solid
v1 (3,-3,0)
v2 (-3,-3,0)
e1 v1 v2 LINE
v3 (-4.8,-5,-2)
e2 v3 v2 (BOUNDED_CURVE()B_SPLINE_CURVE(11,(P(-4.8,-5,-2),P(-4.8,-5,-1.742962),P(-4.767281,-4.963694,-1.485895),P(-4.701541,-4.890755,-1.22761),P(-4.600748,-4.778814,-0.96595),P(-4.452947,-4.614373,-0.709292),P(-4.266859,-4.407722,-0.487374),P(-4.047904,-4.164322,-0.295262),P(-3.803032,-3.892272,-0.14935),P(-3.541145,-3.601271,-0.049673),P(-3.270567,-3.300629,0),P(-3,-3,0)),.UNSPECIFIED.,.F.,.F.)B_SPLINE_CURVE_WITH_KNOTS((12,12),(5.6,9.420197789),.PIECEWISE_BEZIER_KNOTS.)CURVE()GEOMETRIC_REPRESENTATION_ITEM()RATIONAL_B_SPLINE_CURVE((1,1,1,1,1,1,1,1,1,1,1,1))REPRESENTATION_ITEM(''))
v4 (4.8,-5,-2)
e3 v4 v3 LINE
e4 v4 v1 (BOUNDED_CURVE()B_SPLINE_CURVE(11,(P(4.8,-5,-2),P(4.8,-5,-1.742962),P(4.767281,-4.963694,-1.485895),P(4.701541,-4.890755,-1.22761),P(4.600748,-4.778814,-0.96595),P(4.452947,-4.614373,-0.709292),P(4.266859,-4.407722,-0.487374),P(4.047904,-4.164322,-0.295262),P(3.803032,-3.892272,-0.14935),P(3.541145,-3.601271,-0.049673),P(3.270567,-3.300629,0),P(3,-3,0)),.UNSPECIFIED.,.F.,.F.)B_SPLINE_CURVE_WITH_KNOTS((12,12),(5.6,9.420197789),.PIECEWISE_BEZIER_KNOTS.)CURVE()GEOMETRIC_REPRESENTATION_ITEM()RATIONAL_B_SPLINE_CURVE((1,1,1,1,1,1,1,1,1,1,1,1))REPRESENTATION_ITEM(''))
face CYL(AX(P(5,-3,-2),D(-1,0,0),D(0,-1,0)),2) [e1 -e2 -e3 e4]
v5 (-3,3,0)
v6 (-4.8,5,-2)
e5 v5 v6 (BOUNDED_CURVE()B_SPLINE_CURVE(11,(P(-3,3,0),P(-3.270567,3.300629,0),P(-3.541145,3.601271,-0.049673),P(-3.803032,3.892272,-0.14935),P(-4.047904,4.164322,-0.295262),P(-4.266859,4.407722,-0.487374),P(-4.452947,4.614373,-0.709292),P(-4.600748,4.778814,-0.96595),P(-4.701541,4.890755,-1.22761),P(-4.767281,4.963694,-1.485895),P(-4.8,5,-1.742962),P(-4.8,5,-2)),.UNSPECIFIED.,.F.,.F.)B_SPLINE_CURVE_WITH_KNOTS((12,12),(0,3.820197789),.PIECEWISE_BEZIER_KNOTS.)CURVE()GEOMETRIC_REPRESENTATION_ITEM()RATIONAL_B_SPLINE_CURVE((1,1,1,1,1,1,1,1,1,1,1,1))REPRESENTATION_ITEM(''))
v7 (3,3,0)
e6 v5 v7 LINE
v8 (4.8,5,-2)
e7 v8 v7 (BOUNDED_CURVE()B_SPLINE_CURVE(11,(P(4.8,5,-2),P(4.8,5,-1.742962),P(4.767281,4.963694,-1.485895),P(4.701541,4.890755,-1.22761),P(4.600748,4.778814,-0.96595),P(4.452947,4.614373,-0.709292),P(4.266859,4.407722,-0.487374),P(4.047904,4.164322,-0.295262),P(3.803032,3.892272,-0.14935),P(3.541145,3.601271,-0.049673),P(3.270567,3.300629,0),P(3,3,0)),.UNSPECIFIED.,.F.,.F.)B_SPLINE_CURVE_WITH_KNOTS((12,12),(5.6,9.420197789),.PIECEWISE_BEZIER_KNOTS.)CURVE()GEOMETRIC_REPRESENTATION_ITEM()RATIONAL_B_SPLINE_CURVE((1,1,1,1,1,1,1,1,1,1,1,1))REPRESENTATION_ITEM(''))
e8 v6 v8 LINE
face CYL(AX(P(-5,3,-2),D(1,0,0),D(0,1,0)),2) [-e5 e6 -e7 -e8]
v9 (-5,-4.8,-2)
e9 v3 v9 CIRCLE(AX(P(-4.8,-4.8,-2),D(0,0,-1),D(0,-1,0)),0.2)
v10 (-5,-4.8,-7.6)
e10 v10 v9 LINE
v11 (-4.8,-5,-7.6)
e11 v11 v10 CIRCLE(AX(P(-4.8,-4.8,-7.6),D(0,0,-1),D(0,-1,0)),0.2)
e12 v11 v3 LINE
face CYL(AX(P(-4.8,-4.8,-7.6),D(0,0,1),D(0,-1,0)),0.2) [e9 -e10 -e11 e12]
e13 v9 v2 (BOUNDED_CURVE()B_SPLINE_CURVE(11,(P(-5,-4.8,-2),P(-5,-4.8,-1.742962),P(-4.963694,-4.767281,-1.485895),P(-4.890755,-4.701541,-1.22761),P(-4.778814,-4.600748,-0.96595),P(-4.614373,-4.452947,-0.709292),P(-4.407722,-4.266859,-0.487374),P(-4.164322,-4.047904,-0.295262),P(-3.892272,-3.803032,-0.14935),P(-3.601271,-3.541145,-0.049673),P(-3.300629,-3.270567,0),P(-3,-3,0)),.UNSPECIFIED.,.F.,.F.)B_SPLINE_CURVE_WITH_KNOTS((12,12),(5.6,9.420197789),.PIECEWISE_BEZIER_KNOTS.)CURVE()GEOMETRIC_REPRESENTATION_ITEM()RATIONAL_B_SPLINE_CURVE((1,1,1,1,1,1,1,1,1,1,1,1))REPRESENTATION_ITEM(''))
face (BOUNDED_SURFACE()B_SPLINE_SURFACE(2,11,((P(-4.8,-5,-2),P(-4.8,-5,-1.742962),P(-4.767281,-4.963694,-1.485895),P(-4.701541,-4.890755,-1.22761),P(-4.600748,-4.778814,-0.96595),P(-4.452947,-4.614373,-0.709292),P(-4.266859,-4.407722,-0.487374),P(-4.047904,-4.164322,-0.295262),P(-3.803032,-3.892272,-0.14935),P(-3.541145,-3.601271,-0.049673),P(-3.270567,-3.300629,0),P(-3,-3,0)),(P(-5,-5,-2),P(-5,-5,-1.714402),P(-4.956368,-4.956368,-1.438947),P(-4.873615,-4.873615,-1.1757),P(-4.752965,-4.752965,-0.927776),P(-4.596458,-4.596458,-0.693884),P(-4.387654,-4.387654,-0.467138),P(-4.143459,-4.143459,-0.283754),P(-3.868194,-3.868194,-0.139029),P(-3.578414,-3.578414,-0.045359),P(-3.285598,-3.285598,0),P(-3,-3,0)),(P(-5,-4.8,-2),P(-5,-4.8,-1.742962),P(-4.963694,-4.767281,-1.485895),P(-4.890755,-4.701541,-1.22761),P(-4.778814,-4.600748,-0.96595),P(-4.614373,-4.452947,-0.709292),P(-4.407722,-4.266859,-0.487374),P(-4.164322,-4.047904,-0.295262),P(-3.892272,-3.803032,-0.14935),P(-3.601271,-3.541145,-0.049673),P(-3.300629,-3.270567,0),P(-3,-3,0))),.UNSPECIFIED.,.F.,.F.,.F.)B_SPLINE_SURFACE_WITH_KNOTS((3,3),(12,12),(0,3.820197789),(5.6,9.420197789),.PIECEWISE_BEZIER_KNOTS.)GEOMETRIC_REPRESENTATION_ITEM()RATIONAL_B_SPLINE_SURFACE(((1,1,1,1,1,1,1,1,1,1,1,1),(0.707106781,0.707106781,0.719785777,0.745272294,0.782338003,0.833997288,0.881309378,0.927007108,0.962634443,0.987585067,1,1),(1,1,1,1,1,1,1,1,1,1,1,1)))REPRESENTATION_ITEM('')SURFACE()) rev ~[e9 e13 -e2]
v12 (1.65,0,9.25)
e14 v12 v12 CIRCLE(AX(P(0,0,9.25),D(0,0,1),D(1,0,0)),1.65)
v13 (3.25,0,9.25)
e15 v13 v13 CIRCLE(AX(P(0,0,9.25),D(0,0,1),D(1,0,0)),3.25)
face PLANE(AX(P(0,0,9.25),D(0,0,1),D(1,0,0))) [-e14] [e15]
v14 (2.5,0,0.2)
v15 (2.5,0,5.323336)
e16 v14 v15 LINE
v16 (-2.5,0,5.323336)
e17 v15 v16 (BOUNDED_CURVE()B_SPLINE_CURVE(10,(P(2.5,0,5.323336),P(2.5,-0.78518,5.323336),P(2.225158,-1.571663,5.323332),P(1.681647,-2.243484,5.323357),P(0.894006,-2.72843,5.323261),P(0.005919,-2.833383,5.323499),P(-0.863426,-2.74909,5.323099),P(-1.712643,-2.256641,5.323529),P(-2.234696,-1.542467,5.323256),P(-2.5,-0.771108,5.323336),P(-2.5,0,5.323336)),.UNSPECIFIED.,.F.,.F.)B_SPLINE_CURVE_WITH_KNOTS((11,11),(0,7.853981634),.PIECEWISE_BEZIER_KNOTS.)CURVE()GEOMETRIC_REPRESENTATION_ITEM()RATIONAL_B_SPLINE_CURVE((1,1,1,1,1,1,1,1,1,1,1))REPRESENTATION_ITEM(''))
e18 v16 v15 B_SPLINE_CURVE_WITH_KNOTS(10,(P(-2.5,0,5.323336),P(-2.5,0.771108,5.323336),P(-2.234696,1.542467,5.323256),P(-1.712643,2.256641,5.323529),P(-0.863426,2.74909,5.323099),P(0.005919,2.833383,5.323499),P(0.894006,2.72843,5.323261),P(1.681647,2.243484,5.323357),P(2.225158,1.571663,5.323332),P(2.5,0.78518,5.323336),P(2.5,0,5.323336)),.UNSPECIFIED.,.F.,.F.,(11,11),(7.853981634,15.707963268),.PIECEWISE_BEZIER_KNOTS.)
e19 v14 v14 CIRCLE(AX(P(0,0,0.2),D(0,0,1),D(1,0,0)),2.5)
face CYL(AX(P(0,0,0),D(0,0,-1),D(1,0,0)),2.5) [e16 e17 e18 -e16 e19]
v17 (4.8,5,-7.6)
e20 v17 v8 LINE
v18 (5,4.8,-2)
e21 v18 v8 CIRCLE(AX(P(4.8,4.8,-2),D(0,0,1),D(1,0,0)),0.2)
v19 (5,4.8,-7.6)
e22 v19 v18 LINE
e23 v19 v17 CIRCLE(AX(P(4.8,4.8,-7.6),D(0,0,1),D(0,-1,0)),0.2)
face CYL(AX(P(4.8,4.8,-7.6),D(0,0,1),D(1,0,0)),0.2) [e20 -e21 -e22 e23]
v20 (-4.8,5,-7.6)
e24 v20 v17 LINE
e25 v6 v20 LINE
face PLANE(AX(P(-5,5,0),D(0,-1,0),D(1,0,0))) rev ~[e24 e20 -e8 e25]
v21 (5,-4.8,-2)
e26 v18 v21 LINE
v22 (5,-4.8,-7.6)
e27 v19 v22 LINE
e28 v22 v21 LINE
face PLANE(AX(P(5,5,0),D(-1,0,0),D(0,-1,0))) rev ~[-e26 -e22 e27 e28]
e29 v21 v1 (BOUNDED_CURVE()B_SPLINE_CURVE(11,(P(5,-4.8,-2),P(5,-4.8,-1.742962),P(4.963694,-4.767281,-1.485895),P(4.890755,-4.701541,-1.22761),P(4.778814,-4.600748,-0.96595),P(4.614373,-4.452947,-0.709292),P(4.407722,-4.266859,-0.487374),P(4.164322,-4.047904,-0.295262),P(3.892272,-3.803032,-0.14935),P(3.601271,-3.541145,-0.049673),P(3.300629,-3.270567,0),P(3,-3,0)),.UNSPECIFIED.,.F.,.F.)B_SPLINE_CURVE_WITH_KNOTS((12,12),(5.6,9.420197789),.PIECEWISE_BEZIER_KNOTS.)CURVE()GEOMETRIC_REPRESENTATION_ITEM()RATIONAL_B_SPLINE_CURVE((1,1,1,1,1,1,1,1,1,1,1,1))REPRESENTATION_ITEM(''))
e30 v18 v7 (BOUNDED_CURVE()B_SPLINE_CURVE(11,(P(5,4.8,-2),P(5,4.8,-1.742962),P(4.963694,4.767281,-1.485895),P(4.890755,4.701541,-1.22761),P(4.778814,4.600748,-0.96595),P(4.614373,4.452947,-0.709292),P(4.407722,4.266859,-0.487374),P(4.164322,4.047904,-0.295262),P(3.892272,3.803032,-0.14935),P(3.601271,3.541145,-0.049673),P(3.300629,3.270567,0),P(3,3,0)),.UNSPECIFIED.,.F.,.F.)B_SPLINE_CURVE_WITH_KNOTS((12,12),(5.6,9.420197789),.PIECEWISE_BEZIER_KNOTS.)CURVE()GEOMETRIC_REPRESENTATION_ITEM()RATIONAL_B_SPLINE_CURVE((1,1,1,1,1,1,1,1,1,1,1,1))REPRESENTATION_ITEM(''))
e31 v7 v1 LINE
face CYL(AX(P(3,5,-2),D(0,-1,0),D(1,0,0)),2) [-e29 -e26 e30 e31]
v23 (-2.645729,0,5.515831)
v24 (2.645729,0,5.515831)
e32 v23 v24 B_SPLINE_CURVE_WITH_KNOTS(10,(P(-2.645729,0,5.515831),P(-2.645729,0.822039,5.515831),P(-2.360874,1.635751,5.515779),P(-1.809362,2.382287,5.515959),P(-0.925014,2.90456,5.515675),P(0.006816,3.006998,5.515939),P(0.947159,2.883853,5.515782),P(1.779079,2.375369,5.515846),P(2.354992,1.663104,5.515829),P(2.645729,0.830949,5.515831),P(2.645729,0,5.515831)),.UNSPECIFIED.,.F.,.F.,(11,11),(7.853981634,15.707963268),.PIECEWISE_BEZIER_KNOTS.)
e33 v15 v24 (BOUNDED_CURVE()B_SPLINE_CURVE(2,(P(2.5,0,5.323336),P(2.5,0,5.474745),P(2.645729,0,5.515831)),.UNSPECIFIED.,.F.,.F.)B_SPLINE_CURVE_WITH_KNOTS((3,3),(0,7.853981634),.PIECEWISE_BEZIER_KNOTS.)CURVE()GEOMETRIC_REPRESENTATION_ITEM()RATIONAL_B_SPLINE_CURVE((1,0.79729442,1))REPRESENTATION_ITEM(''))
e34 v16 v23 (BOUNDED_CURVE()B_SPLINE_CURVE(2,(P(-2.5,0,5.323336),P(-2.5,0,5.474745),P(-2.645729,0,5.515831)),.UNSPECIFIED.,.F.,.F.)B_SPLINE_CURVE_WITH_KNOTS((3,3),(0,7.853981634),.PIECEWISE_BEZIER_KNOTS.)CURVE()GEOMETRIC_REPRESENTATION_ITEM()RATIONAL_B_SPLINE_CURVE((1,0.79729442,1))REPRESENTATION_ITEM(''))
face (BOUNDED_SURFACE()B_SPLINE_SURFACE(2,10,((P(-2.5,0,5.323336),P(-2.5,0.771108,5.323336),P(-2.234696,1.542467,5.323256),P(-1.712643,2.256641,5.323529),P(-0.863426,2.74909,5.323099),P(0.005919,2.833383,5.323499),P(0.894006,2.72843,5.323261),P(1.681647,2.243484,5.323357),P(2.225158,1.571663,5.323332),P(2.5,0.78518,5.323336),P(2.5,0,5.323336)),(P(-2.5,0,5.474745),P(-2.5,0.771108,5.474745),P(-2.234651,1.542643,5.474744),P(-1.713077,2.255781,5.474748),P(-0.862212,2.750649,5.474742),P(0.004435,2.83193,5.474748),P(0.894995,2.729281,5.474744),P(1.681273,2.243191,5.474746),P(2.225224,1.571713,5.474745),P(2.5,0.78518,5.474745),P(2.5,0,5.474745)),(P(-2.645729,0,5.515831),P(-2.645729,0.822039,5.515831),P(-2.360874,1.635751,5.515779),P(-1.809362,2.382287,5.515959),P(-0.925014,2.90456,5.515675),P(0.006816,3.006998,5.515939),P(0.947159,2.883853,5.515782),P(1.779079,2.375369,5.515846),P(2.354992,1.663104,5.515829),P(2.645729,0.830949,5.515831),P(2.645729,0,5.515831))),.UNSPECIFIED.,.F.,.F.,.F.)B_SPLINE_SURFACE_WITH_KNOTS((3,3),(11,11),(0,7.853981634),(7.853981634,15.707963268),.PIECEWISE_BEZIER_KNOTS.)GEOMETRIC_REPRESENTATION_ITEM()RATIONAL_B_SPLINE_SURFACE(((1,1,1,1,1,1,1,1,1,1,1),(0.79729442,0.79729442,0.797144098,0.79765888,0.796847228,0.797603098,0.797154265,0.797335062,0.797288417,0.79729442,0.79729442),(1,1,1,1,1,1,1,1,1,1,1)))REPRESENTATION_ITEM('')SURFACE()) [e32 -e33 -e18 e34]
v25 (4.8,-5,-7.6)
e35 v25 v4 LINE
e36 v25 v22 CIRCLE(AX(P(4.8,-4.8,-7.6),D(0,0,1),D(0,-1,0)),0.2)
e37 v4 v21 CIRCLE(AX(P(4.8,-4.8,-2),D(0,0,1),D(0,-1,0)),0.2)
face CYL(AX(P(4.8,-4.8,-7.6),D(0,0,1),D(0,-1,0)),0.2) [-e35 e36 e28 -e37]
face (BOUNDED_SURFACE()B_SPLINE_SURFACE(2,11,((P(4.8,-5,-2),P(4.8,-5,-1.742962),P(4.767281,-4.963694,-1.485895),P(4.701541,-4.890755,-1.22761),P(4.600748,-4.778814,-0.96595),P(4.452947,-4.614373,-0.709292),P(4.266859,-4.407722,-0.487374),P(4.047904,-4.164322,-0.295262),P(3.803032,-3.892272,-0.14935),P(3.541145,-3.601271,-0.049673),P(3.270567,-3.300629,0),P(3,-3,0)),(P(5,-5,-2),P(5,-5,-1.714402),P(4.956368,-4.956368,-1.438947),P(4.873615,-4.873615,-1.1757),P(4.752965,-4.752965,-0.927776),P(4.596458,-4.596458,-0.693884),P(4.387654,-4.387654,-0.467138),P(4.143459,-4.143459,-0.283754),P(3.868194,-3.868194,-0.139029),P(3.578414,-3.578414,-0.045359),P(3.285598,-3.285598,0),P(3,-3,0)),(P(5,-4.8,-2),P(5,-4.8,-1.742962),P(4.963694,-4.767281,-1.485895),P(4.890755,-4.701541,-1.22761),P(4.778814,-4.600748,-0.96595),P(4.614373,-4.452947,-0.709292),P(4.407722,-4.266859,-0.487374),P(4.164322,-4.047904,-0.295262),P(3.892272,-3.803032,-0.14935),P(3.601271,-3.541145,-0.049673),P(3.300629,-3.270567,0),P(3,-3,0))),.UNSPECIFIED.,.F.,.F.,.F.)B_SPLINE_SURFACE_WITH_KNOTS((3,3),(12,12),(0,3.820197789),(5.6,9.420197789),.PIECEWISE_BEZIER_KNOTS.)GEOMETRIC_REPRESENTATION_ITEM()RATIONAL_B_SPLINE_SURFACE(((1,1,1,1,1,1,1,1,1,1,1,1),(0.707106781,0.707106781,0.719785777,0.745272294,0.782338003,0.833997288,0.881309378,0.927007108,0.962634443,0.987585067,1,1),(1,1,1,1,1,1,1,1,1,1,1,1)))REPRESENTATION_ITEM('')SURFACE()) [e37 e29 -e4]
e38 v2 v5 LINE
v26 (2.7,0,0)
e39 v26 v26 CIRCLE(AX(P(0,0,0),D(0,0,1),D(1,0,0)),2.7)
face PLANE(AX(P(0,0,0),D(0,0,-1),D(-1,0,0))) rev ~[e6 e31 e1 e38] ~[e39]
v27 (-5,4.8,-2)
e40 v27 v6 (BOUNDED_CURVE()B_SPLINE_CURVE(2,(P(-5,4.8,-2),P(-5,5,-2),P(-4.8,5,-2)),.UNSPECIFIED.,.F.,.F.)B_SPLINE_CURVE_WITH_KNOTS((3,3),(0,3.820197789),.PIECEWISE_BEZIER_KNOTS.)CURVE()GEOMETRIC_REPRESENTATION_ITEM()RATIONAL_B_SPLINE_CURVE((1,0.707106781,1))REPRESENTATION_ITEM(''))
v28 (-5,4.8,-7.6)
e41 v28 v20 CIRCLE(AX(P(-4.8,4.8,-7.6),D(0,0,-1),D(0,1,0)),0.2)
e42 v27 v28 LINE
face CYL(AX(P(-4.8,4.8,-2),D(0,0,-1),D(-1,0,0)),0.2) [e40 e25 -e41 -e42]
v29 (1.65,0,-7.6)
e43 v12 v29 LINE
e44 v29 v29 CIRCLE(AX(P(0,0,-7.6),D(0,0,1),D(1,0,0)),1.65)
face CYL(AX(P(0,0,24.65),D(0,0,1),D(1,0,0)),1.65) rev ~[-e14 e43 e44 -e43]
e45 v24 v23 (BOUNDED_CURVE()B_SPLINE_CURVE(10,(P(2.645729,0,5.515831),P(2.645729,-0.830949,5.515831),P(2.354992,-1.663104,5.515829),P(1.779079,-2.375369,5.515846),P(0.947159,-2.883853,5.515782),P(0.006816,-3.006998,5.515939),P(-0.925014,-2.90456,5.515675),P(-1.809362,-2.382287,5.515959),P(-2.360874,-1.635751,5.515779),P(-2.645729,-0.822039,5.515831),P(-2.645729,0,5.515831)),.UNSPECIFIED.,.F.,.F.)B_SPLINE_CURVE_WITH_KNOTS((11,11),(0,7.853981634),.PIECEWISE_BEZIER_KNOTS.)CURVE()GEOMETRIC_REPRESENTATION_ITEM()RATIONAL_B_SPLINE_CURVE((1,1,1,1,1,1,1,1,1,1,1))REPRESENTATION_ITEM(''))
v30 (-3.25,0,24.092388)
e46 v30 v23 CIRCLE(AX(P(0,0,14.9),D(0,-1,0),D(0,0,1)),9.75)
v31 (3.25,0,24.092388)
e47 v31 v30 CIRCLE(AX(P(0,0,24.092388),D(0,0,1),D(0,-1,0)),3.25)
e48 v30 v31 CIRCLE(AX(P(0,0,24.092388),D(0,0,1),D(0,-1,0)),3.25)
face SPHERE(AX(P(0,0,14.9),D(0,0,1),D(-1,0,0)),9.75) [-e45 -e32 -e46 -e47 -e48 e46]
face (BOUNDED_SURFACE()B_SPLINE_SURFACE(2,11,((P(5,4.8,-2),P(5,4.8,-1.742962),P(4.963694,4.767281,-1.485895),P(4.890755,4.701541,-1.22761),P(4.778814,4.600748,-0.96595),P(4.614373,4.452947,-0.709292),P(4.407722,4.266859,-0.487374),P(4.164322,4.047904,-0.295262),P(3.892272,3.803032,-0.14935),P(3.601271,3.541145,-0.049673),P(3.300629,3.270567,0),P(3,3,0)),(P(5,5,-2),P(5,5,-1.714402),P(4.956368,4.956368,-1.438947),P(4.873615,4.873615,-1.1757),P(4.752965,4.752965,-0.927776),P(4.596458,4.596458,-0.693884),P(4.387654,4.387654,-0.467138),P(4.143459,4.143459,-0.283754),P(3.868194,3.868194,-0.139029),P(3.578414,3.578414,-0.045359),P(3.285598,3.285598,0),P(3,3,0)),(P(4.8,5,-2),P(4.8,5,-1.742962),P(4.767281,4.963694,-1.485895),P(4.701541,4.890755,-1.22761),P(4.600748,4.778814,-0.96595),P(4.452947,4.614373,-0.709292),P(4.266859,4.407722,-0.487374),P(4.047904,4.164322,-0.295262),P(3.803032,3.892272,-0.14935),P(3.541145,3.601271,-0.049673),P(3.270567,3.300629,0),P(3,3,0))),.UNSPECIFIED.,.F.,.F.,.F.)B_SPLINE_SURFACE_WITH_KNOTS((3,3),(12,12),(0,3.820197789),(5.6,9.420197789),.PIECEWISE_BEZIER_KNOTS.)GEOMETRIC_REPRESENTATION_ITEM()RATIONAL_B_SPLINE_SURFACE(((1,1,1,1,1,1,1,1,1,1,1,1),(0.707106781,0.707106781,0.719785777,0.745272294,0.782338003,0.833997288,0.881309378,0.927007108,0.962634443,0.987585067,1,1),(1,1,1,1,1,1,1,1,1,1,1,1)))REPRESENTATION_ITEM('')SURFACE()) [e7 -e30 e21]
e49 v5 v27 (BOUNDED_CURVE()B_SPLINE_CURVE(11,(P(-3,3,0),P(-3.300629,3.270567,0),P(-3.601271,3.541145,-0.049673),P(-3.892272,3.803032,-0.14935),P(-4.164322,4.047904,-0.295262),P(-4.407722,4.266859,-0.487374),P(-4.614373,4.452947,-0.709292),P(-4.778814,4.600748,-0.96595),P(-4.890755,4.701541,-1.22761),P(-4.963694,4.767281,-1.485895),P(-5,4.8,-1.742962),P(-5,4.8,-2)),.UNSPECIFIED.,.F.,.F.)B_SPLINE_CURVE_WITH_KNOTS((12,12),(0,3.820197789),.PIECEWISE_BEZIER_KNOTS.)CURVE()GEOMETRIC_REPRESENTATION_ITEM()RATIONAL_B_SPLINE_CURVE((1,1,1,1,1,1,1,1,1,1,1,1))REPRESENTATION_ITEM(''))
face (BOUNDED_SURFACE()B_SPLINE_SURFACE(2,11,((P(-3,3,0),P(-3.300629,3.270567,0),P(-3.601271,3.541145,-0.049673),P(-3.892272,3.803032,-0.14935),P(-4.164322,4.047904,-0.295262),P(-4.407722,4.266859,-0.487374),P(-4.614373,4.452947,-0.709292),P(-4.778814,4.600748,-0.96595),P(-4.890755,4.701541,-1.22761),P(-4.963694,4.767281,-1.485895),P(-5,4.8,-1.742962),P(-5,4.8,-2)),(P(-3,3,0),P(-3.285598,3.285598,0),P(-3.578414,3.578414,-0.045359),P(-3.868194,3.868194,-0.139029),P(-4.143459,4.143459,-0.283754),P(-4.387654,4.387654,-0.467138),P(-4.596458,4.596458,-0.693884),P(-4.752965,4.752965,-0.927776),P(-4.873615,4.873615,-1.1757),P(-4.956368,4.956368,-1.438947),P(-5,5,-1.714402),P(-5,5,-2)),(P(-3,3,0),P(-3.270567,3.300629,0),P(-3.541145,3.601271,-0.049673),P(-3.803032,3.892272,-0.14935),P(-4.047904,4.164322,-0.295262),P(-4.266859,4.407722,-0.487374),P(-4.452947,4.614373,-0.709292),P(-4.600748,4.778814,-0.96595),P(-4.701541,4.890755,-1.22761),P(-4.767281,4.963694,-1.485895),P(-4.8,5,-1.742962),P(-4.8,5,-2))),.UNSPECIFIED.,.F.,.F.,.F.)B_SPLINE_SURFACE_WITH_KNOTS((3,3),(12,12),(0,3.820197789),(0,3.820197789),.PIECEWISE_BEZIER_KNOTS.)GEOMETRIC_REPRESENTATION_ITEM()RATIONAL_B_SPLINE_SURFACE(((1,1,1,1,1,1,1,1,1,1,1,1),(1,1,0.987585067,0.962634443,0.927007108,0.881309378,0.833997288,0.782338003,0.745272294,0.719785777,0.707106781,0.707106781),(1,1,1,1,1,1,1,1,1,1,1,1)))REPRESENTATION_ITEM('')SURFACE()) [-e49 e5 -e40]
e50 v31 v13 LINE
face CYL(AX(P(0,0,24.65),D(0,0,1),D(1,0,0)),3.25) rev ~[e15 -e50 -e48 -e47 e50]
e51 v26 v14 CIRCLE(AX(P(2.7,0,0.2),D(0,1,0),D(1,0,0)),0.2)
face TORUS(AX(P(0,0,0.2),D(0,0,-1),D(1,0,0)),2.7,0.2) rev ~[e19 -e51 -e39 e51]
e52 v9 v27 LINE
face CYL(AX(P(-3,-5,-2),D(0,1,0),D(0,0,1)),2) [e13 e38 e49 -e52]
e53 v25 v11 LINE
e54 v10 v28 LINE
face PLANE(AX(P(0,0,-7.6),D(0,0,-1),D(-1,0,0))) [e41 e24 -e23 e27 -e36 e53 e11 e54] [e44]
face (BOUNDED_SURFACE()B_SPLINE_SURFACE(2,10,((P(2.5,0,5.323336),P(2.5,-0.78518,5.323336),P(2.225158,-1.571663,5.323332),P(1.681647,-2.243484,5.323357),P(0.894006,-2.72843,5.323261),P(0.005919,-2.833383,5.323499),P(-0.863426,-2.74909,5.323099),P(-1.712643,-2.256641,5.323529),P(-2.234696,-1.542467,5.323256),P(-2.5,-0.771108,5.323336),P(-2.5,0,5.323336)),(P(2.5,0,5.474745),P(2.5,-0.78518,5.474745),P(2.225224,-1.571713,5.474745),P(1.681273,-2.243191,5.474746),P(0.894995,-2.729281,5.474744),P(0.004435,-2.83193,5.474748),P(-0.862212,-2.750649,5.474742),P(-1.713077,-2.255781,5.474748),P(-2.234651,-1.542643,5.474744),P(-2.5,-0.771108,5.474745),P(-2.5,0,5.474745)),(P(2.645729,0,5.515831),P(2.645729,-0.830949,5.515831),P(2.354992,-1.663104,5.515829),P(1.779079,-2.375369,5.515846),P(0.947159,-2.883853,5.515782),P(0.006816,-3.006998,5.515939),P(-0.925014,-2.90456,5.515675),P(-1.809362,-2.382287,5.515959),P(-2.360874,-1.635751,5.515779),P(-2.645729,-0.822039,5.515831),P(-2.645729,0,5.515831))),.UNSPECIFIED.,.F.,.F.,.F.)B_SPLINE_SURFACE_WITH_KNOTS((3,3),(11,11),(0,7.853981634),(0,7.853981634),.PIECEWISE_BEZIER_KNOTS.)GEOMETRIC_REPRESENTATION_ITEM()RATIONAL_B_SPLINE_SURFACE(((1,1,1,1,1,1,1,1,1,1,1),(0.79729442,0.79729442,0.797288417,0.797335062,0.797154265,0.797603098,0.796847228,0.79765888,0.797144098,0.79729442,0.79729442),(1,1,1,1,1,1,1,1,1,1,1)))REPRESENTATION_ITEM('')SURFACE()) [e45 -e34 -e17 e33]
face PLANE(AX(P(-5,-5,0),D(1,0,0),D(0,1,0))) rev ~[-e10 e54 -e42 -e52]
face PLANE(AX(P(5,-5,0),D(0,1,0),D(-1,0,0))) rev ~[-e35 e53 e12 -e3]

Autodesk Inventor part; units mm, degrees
ref_plane "YZ Plane" through (0, 0, 0) normal (1, 0, 0) x (0, 1, 0)
ref_plane "XZ Plane" through (0, 0, 0) normal (0, 1, 0) x (-1, 0, 0)
sketch "Skizze1" plane through (0, 0, 0) normal (0, 0, 1) x (1, 0, 0)
  circle A0 centre (0, 0) radius 2.5
  dimension "d0" = 5
extrude "Extrusion1" add sketch "Skizze1" along normal blind 6
sketch "Skizze3" plane through (0, 0, 0) normal (0, 1, 0) x (-1, 0, 0)
  line L0 (0, 24.65) -> (0, 24.65)
  line L1 (0, 24.65) -> (0, 5.15)
  line L2 (0, 5.15) -> (0, 5.15)
  line L3 (9.75, 14.9) -> (9.75, 14.9)
  arc A0 (9.75, 14.9) -> (0, 24.65) centre (0, 14.9) ccw
  arc A1 (0, 5.15) -> (9.75, 14.9) centre (0, 14.9) ccw
  line L4 (2.5, 6) -> (-2.5, 6) projected
  line L5 (2.5, 0) -> (-2.5, 0) projected
  line L6 (0, -5.3339) -> (0, 32.0031) projected
  point P0 (0, 0)
  point P1 (9.75, 24.65)
  point P2 (0, 14.9)
  point P3 (0, 24.65)
  dimension "d6" = 19.5
  dimension "d7" = 9.75
  dimension "d8" = 9.75
  dimension "d10" = 14.9
  dimension "d11" = 0
revolve "Umdrehung1" add sketch "Skizze3" angle 360 about axis through (0, 0, 24.65) along (0, 0, -1)
ref_plane "Arbeitsebene1" through (0, 0, 24.65) normal (0, 0, 1) x (1, 0, 0)
sketch "Skizze6" plane through (0, 0, 0) normal (0, 0, -1) x (-1, 0, 0)
  line L0 (-5, -5) -> (5, -5)
  line L1 (5, -5) -> (5, 5)
  line L2 (5, 5) -> (-5, 5)
  line L3 (-5, 5) -> (-5, -5)
  point P0 (0, 0)
  dimension "d21" = 5
  dimension "d22" = 5
  dimension "d23" = 10
  dimension "d24" = 5
extrude "Extrusion5" add sketch "Skizze6" along normal blind 7.6
fillet "Rundung6" radius 2 4 edges at (0, -5, 0) (-5, 0, 0) (5, 0, 0) (0, 5, 0)
fillet "Rundung7" radius 0.2 1 edges at (-2.5, 0, 0)
fillet "Rundung8" radius 0.2 8 edges at (-4.4142, -4.4142, -0.5858) (-5, -5, -4.8) (-4.4142, 4.4142, -0.5858) (-5, 5, -4.8) (4.4142, -4.4142, -0.5858) (5, -5, -4.8) (4.4142, 4.4142, -0.5858) (5, 5, -4.8)
sketch "Skizze7" plane through (0, 0, 24.65) normal (0, 0, 1) x (1, 0, 0)
  circle A0 centre (0, 0) radius 1.65
  dimension "d33" = 3.3
extrude "Extrusion6" cut sketch "Skizze7" against normal up to next
fillet "Rundung9" radius 0.2 2 edges at (0, -2.5, 5.476) (0, 2.5, 5.476)
sketch "Skizze8" plane through (0, 0, 24.65) normal (0, 0, 1) x (1, 0, 0)
  circle A0 centre (0, 0) radius 3.25
  dimension "d37" = 6.5
extrude "Extrusion7" cut sketch "Skizze8" against normal blind 15.4
properties part number "balljoint_male"
